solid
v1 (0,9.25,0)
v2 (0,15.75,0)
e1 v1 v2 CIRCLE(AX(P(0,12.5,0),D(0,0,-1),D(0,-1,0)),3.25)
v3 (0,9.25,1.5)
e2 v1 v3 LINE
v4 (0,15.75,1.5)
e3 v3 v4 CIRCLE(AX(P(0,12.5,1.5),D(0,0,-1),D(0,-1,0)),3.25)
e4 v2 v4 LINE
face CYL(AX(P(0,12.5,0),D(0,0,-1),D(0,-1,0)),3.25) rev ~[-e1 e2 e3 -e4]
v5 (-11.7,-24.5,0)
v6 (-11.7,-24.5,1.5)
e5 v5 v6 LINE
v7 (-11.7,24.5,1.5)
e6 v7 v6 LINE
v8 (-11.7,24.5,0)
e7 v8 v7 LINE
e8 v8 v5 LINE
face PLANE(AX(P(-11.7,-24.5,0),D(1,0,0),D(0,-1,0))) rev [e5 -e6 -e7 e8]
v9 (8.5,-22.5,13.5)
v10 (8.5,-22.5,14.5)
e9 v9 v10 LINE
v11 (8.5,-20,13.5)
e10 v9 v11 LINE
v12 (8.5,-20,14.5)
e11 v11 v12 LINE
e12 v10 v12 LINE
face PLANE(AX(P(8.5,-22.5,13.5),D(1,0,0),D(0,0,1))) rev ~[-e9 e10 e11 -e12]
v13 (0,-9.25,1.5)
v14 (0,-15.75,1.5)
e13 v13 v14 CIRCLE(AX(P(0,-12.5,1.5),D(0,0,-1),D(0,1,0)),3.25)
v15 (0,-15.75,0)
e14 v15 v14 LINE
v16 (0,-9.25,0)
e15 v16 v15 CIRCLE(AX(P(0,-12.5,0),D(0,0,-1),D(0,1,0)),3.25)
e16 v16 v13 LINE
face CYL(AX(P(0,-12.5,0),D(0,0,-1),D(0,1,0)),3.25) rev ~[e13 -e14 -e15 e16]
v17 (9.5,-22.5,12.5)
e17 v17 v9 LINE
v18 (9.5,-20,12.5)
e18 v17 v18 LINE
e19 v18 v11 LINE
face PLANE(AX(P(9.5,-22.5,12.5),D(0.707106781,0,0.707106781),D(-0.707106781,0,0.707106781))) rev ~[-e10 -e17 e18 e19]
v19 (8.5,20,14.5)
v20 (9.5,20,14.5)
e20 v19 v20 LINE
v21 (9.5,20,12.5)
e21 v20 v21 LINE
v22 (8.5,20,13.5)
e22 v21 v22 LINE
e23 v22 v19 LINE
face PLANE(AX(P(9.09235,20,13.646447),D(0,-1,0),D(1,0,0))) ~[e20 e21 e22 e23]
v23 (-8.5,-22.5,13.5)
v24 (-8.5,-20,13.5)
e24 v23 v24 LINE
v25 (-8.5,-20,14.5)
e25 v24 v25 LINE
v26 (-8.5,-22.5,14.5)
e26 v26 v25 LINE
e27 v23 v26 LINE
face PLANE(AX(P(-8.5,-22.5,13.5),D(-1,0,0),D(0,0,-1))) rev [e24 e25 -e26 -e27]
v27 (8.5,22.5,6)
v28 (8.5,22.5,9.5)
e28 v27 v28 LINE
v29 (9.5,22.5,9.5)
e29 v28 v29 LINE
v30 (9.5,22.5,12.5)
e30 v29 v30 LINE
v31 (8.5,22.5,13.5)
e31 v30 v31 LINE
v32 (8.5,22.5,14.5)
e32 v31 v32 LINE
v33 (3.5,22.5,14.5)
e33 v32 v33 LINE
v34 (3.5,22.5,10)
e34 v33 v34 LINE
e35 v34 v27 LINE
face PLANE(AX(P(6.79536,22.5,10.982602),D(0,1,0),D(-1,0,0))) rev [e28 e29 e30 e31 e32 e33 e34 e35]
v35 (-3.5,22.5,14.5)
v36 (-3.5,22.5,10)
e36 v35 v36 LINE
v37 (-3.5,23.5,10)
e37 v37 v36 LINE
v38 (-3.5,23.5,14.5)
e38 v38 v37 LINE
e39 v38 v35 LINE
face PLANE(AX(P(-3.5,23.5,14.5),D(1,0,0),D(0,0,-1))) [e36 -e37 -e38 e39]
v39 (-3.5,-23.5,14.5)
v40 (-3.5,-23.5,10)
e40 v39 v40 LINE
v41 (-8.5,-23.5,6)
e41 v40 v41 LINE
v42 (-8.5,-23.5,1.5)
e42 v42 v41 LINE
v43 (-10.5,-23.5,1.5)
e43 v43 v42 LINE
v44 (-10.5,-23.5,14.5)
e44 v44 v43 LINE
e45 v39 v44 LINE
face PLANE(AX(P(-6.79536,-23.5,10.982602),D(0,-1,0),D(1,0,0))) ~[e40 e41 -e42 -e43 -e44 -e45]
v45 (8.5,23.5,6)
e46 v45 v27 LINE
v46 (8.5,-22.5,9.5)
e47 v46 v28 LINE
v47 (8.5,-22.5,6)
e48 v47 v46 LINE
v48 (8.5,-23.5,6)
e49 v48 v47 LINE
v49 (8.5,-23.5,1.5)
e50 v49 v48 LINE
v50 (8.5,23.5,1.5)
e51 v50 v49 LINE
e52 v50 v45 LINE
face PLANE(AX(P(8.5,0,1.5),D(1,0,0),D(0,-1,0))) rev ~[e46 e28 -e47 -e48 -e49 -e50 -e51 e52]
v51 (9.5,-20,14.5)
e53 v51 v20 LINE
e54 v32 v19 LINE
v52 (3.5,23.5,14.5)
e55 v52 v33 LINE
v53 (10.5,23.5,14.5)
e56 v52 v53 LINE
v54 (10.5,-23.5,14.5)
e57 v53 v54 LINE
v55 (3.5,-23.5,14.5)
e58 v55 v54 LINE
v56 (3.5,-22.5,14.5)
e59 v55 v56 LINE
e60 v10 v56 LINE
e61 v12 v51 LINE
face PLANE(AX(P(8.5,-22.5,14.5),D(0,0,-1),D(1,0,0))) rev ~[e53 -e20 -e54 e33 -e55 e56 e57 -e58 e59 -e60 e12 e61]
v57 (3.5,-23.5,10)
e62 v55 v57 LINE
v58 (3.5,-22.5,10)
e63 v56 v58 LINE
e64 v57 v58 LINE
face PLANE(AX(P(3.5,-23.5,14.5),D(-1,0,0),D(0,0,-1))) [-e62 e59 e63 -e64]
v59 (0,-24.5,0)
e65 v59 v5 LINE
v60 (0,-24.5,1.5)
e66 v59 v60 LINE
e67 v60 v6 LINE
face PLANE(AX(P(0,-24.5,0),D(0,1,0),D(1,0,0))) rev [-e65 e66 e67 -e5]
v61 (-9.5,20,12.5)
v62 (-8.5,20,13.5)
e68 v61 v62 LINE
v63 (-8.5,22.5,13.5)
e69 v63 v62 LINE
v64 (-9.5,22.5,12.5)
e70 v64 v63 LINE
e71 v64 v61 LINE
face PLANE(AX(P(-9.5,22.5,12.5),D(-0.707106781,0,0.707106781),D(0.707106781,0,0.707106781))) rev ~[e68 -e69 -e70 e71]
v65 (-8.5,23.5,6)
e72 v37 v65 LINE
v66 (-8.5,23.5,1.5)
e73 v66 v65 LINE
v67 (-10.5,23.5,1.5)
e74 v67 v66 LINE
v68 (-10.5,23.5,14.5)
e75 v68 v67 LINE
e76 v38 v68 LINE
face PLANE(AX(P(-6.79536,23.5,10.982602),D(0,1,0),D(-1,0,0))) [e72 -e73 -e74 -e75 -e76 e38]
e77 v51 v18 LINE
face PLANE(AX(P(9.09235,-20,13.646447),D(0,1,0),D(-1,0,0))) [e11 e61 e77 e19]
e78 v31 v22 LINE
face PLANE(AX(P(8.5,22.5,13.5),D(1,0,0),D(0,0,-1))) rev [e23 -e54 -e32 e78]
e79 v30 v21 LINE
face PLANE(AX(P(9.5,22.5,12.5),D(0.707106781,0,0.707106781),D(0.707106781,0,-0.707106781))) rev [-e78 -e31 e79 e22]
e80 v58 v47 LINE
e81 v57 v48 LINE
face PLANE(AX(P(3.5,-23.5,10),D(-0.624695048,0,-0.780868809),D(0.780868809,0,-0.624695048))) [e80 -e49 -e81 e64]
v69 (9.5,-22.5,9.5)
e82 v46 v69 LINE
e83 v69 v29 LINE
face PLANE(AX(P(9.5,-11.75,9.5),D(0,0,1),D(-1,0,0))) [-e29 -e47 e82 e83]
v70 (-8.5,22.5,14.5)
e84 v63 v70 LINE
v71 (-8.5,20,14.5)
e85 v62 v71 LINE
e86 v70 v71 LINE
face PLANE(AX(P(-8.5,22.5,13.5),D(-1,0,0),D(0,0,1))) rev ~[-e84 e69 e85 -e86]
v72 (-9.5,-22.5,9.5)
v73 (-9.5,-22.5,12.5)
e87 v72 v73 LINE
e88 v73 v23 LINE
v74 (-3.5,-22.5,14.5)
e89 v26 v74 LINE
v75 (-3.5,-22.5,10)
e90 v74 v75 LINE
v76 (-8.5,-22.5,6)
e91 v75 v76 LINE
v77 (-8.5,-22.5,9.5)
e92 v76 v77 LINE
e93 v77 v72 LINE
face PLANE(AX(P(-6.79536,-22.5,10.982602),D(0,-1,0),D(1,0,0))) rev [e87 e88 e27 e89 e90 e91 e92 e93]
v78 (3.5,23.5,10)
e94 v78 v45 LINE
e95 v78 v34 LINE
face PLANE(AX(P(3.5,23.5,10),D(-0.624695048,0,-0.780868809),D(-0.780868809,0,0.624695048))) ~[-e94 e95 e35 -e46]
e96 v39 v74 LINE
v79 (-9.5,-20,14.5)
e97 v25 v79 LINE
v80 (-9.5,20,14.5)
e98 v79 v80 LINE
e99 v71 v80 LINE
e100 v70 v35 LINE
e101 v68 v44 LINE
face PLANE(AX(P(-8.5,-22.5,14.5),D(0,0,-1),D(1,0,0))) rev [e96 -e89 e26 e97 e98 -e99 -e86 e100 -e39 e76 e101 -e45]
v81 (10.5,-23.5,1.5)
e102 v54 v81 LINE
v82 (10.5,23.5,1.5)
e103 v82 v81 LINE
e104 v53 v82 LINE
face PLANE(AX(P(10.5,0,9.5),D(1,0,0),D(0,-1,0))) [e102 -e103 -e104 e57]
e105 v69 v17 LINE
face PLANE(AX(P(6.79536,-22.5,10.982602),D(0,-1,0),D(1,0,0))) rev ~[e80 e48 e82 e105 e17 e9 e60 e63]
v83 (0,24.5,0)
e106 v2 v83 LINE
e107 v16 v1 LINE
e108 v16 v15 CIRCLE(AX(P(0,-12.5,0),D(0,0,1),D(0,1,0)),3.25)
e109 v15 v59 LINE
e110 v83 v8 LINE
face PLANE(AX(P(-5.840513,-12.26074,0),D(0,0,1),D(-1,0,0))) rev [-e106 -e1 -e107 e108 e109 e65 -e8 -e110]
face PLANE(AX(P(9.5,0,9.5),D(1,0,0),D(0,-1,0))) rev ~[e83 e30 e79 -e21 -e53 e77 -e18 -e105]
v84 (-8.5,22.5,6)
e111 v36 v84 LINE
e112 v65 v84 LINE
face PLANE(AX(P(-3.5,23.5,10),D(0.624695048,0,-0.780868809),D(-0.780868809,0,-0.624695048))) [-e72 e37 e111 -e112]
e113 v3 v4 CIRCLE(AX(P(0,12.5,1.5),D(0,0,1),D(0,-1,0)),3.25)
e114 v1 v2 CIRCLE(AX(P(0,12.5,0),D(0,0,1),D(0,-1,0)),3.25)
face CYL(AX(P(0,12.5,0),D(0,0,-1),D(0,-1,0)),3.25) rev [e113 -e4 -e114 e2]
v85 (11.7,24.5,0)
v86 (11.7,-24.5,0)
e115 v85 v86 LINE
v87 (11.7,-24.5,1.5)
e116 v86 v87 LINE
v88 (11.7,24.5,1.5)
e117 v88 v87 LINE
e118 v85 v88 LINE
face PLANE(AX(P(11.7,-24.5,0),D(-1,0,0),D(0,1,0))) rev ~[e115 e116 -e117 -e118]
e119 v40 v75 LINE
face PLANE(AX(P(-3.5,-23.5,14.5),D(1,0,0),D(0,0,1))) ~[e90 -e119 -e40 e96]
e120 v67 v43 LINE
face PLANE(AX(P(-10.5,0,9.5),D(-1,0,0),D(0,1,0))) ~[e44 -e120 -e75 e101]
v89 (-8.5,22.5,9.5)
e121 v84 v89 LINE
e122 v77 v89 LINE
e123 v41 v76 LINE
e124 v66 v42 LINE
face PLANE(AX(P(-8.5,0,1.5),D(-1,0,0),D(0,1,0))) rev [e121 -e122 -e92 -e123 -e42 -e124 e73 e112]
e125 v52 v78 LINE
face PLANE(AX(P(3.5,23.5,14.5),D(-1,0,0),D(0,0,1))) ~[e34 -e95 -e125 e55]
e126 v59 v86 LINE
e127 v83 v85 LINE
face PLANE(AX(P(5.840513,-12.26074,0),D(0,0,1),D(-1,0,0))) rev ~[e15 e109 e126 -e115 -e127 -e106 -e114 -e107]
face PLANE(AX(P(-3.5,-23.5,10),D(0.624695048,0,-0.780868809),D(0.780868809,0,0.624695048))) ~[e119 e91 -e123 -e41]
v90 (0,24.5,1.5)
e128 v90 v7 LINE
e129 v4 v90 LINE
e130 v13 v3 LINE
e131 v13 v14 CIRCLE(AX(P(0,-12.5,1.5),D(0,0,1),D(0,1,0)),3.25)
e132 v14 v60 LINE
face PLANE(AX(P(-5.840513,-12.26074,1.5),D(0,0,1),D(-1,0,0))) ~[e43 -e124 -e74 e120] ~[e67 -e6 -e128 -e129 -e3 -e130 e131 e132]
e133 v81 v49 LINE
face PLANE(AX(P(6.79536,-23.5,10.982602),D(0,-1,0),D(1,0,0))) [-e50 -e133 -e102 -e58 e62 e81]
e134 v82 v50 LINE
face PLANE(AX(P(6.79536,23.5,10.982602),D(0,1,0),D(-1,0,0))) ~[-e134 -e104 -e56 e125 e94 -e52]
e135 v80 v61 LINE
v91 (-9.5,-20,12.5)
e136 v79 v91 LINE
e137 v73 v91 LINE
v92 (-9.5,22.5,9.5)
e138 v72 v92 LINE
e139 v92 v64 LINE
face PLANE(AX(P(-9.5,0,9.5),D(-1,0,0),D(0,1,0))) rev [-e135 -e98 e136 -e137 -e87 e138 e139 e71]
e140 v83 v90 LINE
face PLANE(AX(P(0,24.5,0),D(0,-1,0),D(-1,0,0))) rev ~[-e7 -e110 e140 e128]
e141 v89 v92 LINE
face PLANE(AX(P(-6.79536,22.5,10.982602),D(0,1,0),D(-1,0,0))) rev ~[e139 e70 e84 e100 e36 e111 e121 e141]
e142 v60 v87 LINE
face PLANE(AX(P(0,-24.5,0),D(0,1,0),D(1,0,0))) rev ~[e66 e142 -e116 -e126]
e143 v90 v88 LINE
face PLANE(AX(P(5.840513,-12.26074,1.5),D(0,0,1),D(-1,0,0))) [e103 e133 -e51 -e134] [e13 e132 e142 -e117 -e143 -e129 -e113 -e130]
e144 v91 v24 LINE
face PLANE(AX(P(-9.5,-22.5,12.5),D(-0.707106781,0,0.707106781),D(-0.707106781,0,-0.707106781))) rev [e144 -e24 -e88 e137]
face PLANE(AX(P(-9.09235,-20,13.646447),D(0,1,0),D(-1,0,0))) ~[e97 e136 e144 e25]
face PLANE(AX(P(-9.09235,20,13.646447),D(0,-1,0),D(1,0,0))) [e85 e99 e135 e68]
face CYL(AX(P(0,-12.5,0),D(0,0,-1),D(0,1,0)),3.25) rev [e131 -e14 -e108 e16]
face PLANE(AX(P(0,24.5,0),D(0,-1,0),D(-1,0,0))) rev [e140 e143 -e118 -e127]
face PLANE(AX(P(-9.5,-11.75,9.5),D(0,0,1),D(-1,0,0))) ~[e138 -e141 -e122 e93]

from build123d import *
from build123d import SkipClean  # not in build123d's __all__

# Parameters (mm, degrees)
F1_DEPTH = 1.5
F2_W     = 2
F2_H     = 23.5
F3_DEPTH = 8
F4_W     = 1
F4_H     = 23.5
F5_DEPTH = 5
F7_DEPTH = 1
F9_DEPTH = 2.5


# Not quite as in the source:
# - a feature names something its author has since deleted; it is built from what else it names


with BuildPart() as f1:
    # F0 (on Top) → F1 (new body)
    with BuildSketch(Plane.XY):
        with BuildLine():
            ThreePointArc((0, 9.25), (-3.25, 12.5), (0, 15.75))
            Line((0, 15.75), (0, 24.5))
            Line((0, 24.5), (-11.7, 24.5))
            Line((-11.7, 24.5), (-11.7, 0))
            Line((-11.7, 0), (0, 0))
            Line((0, 0), (0, 9.25))
        make_face()
    extrude(amount=F1_DEPTH)

    # F2 (on face) → F3 (join)
    with BuildSketch(Plane.XY.offset(1.5)):
        with Locations((-9.5, 11.75)):
            Rectangle(F2_W, F2_H)
    extrude(amount=F3_DEPTH)

    # F4 (on face) → F5 (join)
    with BuildSketch(Plane.XY.offset(9.5)):
        with Locations((-10, 11.75)):
            Rectangle(F4_W, F4_H)
    extrude(amount=F5_DEPTH)

    # F6 (on face) → F7 (join)
    with BuildSketch(Plane(origin=(0, 23.5, 0), x_dir=(-1, 0, 0), z_dir=(0, 1, 0))):
        Polygon((9.5, 9.5), (9.5, 14.5), (3.5, 14.5), (3.5, 10), (8.5, 6), (8.5, 9.5), align=None)
    extrude(amount=-F7_DEPTH)

    # F8 (on face) → F9 (join)
    with BuildSketch(Plane.XZ.offset(-22.5)):
        Polygon((-8.5, 14.5), (-9.5, 14.5), (-9.5, 12.5), (-8.5, 13.5), align=None)
    extrude(amount=F9_DEPTH)

    # F10: F1 across plane


with BuildPart() as f1_1:
    add(f1.part, clean=False)
    add(f1.part.mirror(Plane.XZ), clean=False)

    # F11: F1 across plane


with BuildPart() as f1_2:
    add(f1_1.part, clean=False)
    with SkipClean():  # cleaning this boolean's faces spoils the solid; the shape is the same uncleaned
        add(f1_1.part.mirror(Plane.YZ), clean=False)


solid = f1_2.part
